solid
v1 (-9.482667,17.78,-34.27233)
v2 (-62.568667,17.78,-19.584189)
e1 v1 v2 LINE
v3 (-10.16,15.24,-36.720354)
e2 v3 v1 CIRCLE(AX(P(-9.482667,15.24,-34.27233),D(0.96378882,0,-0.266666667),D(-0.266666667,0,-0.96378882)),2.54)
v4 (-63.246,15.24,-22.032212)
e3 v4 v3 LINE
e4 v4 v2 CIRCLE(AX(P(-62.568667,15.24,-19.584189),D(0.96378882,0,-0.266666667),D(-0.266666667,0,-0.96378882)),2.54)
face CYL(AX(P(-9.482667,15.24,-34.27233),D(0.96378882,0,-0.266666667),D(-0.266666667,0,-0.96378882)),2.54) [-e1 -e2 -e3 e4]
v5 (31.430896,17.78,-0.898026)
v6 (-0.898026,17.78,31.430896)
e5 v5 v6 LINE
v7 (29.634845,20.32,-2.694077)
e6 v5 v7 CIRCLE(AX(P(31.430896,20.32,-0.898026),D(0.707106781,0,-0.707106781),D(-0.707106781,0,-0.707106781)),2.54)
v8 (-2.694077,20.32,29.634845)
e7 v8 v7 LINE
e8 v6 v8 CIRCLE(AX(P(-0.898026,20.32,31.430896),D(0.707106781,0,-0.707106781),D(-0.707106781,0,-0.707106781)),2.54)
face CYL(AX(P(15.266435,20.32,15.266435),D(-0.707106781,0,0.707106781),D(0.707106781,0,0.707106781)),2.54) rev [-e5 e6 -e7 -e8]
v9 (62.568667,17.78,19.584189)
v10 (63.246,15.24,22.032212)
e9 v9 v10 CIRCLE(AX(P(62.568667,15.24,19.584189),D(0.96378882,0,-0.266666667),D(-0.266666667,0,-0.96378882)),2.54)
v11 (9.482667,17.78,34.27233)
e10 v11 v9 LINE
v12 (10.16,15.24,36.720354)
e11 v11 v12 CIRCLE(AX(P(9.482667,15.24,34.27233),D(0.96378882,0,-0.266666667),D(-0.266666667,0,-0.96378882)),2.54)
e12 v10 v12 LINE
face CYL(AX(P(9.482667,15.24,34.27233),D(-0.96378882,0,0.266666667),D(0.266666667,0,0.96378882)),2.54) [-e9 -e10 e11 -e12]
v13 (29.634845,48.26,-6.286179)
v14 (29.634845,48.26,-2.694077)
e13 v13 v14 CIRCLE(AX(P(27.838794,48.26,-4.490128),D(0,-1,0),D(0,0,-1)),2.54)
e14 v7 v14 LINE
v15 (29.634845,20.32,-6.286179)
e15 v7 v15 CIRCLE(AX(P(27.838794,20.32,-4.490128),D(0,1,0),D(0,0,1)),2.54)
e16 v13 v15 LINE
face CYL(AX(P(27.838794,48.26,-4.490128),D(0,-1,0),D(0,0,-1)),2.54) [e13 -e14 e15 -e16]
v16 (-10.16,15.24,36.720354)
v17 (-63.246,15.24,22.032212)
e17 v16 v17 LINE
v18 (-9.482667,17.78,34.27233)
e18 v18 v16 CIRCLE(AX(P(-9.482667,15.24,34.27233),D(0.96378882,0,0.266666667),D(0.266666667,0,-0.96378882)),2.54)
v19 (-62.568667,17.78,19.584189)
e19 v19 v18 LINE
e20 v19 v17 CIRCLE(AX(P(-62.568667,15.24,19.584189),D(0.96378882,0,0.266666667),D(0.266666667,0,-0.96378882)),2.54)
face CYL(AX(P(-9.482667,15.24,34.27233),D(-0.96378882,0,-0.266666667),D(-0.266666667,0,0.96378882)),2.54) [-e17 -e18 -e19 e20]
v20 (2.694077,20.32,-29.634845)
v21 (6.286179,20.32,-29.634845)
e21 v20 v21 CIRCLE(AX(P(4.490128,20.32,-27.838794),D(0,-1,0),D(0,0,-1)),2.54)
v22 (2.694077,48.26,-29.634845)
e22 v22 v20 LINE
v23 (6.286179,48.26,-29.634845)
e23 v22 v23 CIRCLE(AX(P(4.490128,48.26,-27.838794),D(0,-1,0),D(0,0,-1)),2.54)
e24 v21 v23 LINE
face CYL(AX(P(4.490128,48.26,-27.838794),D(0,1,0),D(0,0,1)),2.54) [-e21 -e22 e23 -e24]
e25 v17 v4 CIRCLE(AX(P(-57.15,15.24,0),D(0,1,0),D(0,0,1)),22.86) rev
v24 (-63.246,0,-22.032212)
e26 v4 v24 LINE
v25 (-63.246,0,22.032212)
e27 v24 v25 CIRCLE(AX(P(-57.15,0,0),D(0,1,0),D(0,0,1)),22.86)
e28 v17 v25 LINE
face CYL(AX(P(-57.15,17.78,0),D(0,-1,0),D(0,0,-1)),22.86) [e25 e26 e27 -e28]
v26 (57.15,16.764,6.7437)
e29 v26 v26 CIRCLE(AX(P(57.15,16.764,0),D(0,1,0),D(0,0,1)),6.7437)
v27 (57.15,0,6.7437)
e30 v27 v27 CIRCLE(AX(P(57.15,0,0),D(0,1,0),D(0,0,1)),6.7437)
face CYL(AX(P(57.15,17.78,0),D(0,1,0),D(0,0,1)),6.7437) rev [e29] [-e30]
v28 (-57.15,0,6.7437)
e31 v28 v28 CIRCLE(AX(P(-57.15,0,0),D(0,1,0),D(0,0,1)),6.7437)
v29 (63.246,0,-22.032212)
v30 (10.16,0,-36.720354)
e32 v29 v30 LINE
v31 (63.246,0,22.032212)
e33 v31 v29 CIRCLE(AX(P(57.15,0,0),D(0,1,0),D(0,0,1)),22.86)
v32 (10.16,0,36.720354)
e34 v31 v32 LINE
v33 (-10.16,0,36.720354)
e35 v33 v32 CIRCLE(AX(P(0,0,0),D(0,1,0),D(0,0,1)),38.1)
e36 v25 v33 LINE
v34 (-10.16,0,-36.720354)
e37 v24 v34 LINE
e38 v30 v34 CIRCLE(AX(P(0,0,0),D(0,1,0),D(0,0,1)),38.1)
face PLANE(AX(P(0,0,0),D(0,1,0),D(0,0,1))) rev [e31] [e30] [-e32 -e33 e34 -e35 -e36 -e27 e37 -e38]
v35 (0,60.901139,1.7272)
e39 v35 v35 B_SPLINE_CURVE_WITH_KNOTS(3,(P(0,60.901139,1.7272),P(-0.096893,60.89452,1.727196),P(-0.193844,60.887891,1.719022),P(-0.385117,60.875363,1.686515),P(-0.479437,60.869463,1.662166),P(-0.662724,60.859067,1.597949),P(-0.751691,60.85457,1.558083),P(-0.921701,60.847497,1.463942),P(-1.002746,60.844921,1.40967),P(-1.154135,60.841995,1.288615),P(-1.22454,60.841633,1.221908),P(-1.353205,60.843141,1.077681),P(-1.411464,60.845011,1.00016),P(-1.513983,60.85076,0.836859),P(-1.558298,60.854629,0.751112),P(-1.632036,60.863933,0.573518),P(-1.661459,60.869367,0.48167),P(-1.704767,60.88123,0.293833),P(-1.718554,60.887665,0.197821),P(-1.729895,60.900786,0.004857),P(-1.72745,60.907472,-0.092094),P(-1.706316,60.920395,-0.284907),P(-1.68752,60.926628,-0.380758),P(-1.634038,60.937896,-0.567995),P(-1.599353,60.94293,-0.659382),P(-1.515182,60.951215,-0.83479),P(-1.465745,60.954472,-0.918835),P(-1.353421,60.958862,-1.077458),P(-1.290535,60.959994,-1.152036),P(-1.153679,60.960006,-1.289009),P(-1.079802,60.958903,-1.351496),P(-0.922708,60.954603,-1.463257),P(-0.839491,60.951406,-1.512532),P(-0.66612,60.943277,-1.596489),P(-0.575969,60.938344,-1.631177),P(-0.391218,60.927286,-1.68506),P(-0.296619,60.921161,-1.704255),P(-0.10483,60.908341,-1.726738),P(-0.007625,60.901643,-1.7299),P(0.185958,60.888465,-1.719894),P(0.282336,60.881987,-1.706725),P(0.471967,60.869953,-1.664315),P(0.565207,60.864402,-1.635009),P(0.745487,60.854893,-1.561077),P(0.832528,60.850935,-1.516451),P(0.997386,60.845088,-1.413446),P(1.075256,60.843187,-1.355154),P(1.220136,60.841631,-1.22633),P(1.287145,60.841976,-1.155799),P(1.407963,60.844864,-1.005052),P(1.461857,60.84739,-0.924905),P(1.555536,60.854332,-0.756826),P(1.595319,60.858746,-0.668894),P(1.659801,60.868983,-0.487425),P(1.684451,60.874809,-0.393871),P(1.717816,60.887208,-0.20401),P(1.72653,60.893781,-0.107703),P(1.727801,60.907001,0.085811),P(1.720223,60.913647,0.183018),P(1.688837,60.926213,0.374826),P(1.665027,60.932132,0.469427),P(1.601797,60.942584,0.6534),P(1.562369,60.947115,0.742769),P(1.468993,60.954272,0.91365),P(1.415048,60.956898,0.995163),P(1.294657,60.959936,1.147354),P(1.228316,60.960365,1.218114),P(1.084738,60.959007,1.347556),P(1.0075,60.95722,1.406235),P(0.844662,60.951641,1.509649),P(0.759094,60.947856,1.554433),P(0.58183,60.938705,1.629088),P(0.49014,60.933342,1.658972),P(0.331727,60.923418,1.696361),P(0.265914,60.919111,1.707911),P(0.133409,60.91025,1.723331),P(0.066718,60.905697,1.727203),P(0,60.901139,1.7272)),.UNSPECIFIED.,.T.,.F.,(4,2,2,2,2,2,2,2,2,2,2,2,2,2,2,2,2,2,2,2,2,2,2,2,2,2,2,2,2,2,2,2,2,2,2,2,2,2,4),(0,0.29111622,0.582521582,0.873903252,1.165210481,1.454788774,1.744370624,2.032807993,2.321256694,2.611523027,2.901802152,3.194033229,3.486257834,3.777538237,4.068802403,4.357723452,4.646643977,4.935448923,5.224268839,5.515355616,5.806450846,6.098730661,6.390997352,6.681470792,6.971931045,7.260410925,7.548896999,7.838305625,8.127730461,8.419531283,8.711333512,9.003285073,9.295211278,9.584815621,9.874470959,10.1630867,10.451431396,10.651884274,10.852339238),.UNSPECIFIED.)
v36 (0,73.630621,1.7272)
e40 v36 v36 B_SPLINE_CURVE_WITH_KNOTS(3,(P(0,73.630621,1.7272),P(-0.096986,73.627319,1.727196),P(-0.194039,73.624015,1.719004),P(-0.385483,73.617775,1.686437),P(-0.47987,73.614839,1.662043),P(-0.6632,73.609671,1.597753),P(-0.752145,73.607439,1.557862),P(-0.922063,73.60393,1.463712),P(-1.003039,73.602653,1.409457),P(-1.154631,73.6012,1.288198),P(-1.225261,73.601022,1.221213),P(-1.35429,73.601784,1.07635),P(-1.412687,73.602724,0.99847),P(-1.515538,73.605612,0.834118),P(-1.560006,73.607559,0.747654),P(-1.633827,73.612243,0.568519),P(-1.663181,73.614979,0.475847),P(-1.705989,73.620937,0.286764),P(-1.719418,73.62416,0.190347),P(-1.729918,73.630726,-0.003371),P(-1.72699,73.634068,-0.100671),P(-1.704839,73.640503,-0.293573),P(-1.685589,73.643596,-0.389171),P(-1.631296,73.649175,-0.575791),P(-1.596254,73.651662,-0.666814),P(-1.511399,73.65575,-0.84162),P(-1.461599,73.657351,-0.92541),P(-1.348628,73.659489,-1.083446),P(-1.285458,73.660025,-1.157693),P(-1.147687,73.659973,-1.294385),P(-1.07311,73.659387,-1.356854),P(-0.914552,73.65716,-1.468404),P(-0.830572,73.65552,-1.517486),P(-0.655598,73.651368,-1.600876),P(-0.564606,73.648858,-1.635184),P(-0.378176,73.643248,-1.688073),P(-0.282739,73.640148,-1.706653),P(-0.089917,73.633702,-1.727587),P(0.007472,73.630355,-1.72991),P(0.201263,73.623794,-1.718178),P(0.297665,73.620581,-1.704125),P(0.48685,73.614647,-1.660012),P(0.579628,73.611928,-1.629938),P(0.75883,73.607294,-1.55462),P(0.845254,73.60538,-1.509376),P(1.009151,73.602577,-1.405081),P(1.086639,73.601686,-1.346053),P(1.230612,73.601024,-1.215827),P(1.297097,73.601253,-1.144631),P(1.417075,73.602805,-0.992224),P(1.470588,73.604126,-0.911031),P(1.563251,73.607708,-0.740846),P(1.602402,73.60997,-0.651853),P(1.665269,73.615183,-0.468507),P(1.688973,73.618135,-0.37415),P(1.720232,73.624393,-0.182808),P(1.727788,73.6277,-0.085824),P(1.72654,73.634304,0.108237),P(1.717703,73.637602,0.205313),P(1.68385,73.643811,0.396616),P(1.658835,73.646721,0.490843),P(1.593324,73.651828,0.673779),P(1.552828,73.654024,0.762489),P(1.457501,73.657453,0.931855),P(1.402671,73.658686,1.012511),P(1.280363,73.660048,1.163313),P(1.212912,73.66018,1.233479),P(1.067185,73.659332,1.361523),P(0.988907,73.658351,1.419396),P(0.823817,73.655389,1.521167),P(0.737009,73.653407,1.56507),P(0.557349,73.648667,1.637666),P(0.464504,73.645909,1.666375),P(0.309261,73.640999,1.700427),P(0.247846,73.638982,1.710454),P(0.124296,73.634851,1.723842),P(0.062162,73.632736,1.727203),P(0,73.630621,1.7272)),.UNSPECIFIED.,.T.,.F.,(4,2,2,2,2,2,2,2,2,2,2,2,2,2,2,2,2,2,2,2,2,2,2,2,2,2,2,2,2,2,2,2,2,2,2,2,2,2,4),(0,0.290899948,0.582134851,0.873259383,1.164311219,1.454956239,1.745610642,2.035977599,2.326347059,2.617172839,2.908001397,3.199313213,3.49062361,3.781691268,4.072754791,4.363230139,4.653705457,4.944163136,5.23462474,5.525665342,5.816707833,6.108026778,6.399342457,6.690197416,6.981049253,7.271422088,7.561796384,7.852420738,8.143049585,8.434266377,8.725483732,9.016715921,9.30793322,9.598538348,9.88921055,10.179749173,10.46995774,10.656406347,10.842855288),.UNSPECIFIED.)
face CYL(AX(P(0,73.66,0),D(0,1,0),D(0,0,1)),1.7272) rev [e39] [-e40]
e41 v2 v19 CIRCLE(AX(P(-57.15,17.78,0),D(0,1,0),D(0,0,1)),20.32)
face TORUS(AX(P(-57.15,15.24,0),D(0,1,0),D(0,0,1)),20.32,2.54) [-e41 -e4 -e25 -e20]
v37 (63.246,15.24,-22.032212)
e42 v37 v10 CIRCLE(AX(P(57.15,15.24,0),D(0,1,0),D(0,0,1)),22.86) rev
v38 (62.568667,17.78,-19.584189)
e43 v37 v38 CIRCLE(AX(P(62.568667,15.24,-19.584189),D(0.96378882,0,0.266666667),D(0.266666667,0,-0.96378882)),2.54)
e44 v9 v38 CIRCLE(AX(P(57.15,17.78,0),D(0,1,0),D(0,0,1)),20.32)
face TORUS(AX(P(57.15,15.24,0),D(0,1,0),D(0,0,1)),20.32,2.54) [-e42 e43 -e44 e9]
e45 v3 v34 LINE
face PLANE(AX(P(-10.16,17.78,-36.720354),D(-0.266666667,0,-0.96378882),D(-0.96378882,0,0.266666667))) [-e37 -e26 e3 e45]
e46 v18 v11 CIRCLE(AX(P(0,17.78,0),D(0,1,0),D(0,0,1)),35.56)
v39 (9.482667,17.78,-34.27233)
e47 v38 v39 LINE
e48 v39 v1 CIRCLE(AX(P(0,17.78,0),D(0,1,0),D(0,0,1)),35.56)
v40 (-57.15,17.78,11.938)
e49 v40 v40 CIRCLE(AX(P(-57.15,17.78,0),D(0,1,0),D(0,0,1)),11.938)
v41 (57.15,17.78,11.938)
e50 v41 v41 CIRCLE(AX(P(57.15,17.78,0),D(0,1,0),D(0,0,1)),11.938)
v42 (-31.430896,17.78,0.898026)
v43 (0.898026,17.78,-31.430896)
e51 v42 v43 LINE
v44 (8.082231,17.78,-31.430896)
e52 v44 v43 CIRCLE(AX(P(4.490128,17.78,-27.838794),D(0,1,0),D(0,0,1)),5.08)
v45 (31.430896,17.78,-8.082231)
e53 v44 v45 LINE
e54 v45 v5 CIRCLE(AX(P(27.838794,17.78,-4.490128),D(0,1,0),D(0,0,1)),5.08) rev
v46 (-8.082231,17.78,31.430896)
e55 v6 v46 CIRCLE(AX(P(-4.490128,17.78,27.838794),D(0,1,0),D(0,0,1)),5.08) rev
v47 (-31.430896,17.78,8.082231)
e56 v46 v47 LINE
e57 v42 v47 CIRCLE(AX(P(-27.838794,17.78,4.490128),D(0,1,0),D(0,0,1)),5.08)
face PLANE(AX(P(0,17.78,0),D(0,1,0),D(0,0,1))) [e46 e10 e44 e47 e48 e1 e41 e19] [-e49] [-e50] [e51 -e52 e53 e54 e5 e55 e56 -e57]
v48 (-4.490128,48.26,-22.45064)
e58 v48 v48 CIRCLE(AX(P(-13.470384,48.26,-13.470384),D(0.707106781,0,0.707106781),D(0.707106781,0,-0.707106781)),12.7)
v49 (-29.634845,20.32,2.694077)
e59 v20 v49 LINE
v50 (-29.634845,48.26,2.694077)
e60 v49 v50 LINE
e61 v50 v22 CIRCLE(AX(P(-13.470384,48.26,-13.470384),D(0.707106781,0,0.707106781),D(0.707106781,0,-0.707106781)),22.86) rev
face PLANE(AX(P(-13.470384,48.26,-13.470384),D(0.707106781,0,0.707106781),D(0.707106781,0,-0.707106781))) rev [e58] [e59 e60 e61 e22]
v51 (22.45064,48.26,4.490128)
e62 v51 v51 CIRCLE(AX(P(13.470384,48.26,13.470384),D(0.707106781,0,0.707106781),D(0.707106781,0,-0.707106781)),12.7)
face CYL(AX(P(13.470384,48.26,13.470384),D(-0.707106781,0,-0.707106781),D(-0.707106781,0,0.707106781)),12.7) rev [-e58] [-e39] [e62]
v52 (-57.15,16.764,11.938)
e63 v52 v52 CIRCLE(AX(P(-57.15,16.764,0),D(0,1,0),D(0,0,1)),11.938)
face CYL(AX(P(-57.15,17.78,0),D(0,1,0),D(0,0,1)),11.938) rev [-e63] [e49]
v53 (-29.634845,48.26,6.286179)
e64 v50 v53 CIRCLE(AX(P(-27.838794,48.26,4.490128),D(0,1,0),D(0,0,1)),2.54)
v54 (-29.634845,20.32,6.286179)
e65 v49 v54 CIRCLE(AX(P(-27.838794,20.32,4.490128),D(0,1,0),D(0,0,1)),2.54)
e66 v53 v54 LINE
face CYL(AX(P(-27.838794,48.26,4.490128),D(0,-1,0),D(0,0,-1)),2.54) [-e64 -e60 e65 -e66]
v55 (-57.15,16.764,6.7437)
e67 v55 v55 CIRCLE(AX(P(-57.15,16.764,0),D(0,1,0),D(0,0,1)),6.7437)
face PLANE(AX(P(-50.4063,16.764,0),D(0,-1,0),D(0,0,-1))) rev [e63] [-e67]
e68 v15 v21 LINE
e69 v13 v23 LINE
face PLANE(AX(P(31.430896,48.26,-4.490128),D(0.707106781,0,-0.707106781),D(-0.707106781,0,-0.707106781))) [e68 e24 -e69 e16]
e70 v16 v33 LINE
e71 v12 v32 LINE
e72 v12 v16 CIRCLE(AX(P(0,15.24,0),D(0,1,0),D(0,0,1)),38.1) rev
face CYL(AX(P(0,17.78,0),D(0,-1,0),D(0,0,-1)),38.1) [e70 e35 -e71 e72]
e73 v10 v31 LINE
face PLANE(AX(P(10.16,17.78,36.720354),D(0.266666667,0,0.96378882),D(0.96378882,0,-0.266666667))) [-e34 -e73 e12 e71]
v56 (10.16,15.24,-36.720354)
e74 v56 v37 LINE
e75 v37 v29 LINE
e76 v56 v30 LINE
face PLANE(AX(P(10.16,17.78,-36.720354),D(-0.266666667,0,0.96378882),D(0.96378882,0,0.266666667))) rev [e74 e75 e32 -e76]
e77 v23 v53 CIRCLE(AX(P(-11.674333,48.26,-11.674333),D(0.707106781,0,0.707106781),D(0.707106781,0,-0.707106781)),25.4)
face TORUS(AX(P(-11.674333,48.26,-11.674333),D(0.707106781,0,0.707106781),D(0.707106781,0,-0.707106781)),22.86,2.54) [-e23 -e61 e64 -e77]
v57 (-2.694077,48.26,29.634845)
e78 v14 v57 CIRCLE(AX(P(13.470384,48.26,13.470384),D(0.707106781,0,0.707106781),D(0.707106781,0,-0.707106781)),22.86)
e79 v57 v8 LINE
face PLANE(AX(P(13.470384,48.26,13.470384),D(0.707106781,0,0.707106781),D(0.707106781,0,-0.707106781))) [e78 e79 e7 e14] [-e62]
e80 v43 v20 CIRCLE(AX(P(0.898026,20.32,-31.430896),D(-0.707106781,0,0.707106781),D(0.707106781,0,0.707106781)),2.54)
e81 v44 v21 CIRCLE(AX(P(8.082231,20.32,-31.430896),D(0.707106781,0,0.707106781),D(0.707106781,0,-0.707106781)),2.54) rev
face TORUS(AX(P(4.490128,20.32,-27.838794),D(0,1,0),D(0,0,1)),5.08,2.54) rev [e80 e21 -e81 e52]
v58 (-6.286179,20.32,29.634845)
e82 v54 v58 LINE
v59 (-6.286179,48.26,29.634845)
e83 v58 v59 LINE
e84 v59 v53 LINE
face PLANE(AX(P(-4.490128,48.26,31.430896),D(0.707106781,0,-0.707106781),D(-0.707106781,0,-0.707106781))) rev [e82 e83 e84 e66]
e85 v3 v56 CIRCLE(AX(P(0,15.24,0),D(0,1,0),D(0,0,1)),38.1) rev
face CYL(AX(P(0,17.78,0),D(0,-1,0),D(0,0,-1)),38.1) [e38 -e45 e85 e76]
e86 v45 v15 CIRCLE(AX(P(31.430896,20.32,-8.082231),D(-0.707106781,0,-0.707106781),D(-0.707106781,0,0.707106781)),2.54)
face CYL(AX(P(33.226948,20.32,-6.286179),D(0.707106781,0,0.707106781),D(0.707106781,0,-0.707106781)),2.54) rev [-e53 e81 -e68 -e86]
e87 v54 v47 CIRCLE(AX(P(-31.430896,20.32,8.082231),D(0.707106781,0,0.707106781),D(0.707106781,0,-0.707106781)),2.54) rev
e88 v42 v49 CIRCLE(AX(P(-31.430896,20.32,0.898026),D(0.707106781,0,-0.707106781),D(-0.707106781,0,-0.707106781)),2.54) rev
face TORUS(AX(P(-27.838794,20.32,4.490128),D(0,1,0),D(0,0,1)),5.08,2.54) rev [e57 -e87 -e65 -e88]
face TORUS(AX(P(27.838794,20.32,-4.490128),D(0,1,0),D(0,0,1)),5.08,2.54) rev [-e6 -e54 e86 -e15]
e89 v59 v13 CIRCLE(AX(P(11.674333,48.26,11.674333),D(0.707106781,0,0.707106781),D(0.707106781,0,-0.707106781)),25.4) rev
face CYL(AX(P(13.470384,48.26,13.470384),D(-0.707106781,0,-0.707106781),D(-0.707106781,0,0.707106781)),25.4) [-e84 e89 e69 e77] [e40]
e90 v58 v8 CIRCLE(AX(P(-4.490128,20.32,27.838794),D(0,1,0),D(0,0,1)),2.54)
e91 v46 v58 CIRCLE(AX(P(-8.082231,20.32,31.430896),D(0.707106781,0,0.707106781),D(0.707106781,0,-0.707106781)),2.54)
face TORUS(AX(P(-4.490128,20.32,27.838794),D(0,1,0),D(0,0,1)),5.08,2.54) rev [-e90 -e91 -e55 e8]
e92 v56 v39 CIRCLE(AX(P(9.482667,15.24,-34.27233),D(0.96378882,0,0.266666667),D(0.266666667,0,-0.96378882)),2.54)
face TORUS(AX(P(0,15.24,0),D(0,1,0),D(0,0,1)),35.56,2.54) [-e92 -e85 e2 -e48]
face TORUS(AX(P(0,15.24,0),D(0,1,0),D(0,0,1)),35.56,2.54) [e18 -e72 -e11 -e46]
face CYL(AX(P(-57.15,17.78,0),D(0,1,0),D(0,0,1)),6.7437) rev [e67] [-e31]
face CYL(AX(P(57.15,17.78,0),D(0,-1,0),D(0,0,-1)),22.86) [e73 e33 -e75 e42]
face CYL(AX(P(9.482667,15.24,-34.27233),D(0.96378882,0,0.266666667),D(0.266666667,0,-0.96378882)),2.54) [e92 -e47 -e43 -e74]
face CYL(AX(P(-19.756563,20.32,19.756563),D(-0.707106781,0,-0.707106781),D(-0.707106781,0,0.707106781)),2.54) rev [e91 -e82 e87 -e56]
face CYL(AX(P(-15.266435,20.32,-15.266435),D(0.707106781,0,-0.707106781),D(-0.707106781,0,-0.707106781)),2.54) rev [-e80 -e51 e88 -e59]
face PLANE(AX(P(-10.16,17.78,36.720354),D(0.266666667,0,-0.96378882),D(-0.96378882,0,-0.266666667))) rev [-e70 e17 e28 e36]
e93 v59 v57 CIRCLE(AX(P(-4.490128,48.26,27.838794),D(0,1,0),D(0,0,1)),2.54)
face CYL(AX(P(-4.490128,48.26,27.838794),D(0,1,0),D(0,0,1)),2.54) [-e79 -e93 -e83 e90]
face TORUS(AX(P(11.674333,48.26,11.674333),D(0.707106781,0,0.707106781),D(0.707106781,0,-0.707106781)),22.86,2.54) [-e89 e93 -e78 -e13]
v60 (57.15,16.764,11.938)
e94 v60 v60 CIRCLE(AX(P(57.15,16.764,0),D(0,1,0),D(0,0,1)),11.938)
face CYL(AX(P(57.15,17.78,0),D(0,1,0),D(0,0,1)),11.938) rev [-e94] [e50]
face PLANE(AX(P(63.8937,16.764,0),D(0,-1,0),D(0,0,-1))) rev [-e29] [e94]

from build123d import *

# Parameters (mm, degrees)
BOSS_EXTRUDE1_DEPTH                                 = 17.78
CBORE_FOR_00_BINDING_HEAD_MACHINE_SCREW_D           = 13.4874
CBORE_FOR_00_BINDING_HEAD_MACHINE_SCREW_CBORE_D     = 23.876
CBORE_FOR_00_BINDING_HEAD_MACHINE_SCREW_CBORE_DEPTH = 1.016
BOSS_EXTRUDE3_DEPTH                                 = 19.05
SKETCH10_R                                          = 12.7
CUT_EXTRUDE1_DEPTH                                  = 19.05
F_29_0_136_DIAMETER_HOLE1_REACH                     = 117.235
F_29_0_136_DIAMETER_HOLE1_BORE_R                    = 1.7272
FILLET1_R                                           = 2.54
FILLET2_R                                           = 2.54
FILLET3_R                                           = 2.54
FILLET4_R                                           = 2.54
FILLET5_START                                       = -22.86
FILLET5_3_DEPTH                                     = 45.72


with BuildPart() as part:
    # Sketch1 → Boss-Extrude1 (new body)
    with BuildSketch(Plane(origin=(0, 0, 0), x_dir=(1, 0, 0), z_dir=(0, 1, 0))):
        with BuildLine():
            Line((63.246, 22.032212417), (10.16, 36.720354029))
            ThreePointArc((10.16, 36.720354029), (0, 38.1), (-10.16, 36.720354029))
            Line((-10.16, 36.720354029), (-63.246, 22.032212417))
            ThreePointArc((-63.246, 22.032212417), (-80.01, 0), (-63.246, -22.032212417))
            Line((-63.246, -22.032212417), (-10.16, -36.720354029))
            ThreePointArc((-10.16, -36.720354029), (0, -38.1), (10.16, -36.720354029))
            Line((10.16, -36.720354029), (63.246, -22.032212417))
            ThreePointArc((63.246, -22.032212417), (80.01, 0), (63.246, 22.032212417))
        make_face()
    extrude(amount=BOSS_EXTRUDE1_DEPTH)

    # CBORE for #00 Binding Head Machine Screw2 (through all)
    with Locations(Plane(origin=(0, 17.78, 0), x_dir=(1, 0, 0), z_dir=(0, 1, 0))):
        with Locations((-57.15, 0), (57.15, 0)):
            CounterBoreHole(CBORE_FOR_00_BINDING_HEAD_MACHINE_SCREW_D / 2, CBORE_FOR_00_BINDING_HEAD_MACHINE_SCREW_CBORE_D / 2, CBORE_FOR_00_BINDING_HEAD_MACHINE_SCREW_CBORE_DEPTH)

    # Sketch7 → Boss-Extrude3 (add, symmetric)
    with BuildSketch(Plane(origin=(0, 0, 0), x_dir=(0, -1, 0), z_dir=(0.7071067811865464, 0, 0.7071067811865488))):
        with BuildLine():
            Line((-48.26, -25.4), (-17.78, -25.4))
            Line((-17.78, -25.4), (-17.78, 25.4))
            Line((-17.78, 25.4), (-48.26, 25.4))
            ThreePointArc((-48.26, 25.4), (-73.66, 0), (-48.26, -25.4))
        make_face()
    extrude(amount=BOSS_EXTRUDE3_DEPTH, both=True)

    # Sketch10 → Cut-Extrude1 (cut, symmetric)
    with BuildSketch(Plane(origin=(0, 0, 0), x_dir=(0, -1, 0), z_dir=(0.7071067811865464, 0, 0.7071067811865488))):
        with Locations(Location((-48.26, 0, 0), (0, 0, 90))):
            Circle(SKETCH10_R)
    extrude(amount=CUT_EXTRUDE1_DEPTH, both=True, mode=Mode.SUBTRACT)

    # #29 (0.136) Diameter Hole1 bore (on position points) → #29 (0.136) Diameter Hole1 (cut, up to next)
    with BuildSketch(Plane.ZX.offset(73.66), mode=Mode.PRIVATE) as f_29_0_136_diameter_hole1_sk1:
        Circle(F_29_0_136_DIAMETER_HOLE1_BORE_R)
    f_29_0_136_diameter_hole1_tool1 = extrude(f_29_0_136_diameter_hole1_sk1.sketch, amount=-F_29_0_136_DIAMETER_HOLE1_REACH, mode=Mode.PRIVATE) & part.part
    add(f_29_0_136_diameter_hole1_tool1.solids().sort_by_distance((0, 73.66, 0))[0], mode=Mode.SUBTRACT)

    # Fillet1
    fillet1_edges = [part.edges().sort_by_distance(p)[0] for p in [
        (-36.703, 17.78, -29.376283223),
        (-80.01, 17.78, 0),
        (-36.703, 17.78, 29.376283223),
        (0, 17.78, 38.1),
        (36.703, 17.78, 29.376283223),
        (80.01, 17.78, 0),
        (36.703, 17.78, -29.376283223),
        (0, 17.78, -38.1),
    ]]
    fillet(fillet1_edges, radius=FILLET1_R)

    # Fillet2
    fillet2_edges = [part.edges().sort_by_distance(p)[0] for p in [
        (31.430896424, 33.02, -4.490128061),
        (-4.490128061, 33.02, 31.430896424),
        (13.470384182, 73.66, 13.470384182),
    ]]
    fillet(fillet2_edges, radius=FILLET2_R)

    # Fillet3
    fillet3_edges = [part.edges().sort_by_distance(p)[0] for p in [
        (17.06248663, 17.78, -18.858537854),
        (13.470384182, 17.78, 13.470384182),
        (-18.858537854, 17.78, 17.06248663),
        (30.378793975, 17.78, -4.490128061),
        (-4.490128061, 17.78, 30.378793975),
    ]]
    fillet(fillet3_edges, radius=FILLET3_R)

    # Fillet4
    # the kernel refuses this fillet: 2.54 mm, written as the material it takes off along each edge
    with BuildSketch(Plane(origin=(-33.226947648, 20.32, 6.286179285), x_dir=(-0.4226145849074772, 0.8017442392976469, 0.42261458490747583), z_dir=(0.5669187883846173, 0.5976672776328292, -0.5669187883846153))) as fillet4_piece_1_section:
        with BuildLine():
            CenterArc((2.54 + FILLET4_R, FILLET4_R), FILLET4_R, 180, 90)
            Line((2.54, FILLET4_R), (2.54, 0))
            Line((2.54, 0), (2.54 + FILLET4_R, 0))
        make_face()
    fillet4_piece_1 = revolve(axis=Axis((-33.226947648, 20.32, 6.286179285), (0.7071067811865464, 0, 0.7071067811865488)), revolution_arc=233.296989237, mode=Mode.PRIVATE)
    fillet4_piece_1 = split(fillet4_piece_1, bisect_by=Plane(origin=(-33.226947648, 17.78, 6.286179285), z_dir=(0, 1, 0)), keep=Keep.TOP, mode=Mode.PRIVATE)
    add(fillet4_piece_1, mode=Mode.SUBTRACT)
    with BuildSketch(Plane(origin=(6.286179285, 20.32, -33.226947648), x_dir=(0.4226145849074753, 0.8017442392976486, -0.42261458490747456), z_dir=(-0.5669187883846184, 0.597667277632827, 0.5669187883846165))) as fillet4_piece_2_section:
        with BuildLine():
            CenterArc((2.54 + FILLET4_R, -FILLET4_R), FILLET4_R, 90, 90)
            Line((2.54, -FILLET4_R), (2.54, 0))
            Line((2.54, 0), (2.54 + FILLET4_R, 0))
        make_face()
    fillet4_piece_2 = revolve(axis=Axis((6.286179285, 20.32, -33.226947648), (-0.7071067811865464, 0, -0.7071067811865488)), revolution_arc=233.296989237, mode=Mode.PRIVATE)
    fillet4_piece_2 = split(fillet4_piece_2, bisect_by=Plane(origin=(6.286179285, 17.78, -33.226947648), z_dir=(0, 1, 0)), keep=Keep.TOP, mode=Mode.PRIVATE)
    add(fillet4_piece_2, mode=Mode.SUBTRACT)
    with BuildSketch(Plane(origin=(-31.430896424, 48.26, 4.490128061), x_dir=(0.7071067811865488, 0, -0.7071067811865462), z_dir=(0, -1, 0)), Plane(origin=(4.490128061, 20.32, -31.430896424), x_dir=(-0.707106781186549, 0, 0.7071067811865461), z_dir=(0, 1, 0))) as fillet4_piece_3:
        with BuildLine():
            CenterArc((FILLET4_R, FILLET4_R), FILLET4_R, 180, 90)
            Line((0, FILLET4_R), (0, 0))
            Line((0, 0), (FILLET4_R, 0))
        make_face()
    extrude(amount=27.94, mode=Mode.SUBTRACT)
    with BuildSketch(Plane(origin=(-13.470384182, 48.26, -13.470384182), x_dir=(0.7071067811865487, 0, -0.7071067811865464), z_dir=(0, -1, 0))) as fillet4_piece_4:
        with BuildLine():
            CenterArc((25.4 - FILLET4_R, FILLET4_R), FILLET4_R, 270, 90)
            Line((25.4, FILLET4_R), (25.4, 0))
            Line((25.4, 0), (25.4 - FILLET4_R, 0))
        make_face()
    revolve(axis=Axis((-13.470384182, 48.26, -13.470384182), (0.7071067811865464, 0, 0.7071067811865488)), revolution_arc=180, mode=Mode.SUBTRACT)

    # Fillet5: read off the stored shape, not the designer's step
    # Fillet5 outline → Fillet5 (revolve)
    with BuildSketch(Plane(origin=(-27.838793975, 0, 4.490128061), x_dir=(1, 0, 0), z_dir=(0, 0, 1))):
        with BuildLine():
            ThreePointArc((5.08, 17.78), (3.283948776, 18.523948776), (2.54, 20.32))
            Line((2.54, 20.32), (2.54, 17.78))
            Line((2.54, 17.78), (5.08, 17.78))
        make_face()
    revolve(axis=Axis((-27.838793975, 0, 4.490128061), (0, 1, 0)))

    # Fillet5 2 outline → Fillet5 2 (revolve)
    with BuildSketch(Plane(origin=(4.490128061, 0, -27.838793975), x_dir=(1, 0, 0), z_dir=(0, 0, 1))):
        with BuildLine():
            ThreePointArc((5.08, 17.78), (3.283948776, 18.523948776), (2.54, 20.32))
            Line((2.54, 20.32), (2.54, 17.78))
            Line((2.54, 17.78), (5.08, 17.78))
        make_face()
    revolve(axis=Axis((4.490128061, 0, -27.838793975), (0, 1, 0)))

    # Fillet5 3 outline → Fillet5 3 (add)
    with BuildSketch(Plane(origin=(0, 0, 0), x_dir=(0.707106781186546, 0, 0.707106781186549), z_dir=(0.707106781186549, 0, -0.707106781186546)).offset(FILLET5_START)):
        with BuildLine():
            ThreePointArc((-21.59, -17.78), (-19.793948776, -18.523948776), (-19.05, -20.32))
            Line((-19.05, -20.32), (-19.05, -17.78))
            Line((-19.05, -17.78), (-21.59, -17.78))
        make_face()
    extrude(amount=FILLET5_3_DEPTH)


solid = part.part
